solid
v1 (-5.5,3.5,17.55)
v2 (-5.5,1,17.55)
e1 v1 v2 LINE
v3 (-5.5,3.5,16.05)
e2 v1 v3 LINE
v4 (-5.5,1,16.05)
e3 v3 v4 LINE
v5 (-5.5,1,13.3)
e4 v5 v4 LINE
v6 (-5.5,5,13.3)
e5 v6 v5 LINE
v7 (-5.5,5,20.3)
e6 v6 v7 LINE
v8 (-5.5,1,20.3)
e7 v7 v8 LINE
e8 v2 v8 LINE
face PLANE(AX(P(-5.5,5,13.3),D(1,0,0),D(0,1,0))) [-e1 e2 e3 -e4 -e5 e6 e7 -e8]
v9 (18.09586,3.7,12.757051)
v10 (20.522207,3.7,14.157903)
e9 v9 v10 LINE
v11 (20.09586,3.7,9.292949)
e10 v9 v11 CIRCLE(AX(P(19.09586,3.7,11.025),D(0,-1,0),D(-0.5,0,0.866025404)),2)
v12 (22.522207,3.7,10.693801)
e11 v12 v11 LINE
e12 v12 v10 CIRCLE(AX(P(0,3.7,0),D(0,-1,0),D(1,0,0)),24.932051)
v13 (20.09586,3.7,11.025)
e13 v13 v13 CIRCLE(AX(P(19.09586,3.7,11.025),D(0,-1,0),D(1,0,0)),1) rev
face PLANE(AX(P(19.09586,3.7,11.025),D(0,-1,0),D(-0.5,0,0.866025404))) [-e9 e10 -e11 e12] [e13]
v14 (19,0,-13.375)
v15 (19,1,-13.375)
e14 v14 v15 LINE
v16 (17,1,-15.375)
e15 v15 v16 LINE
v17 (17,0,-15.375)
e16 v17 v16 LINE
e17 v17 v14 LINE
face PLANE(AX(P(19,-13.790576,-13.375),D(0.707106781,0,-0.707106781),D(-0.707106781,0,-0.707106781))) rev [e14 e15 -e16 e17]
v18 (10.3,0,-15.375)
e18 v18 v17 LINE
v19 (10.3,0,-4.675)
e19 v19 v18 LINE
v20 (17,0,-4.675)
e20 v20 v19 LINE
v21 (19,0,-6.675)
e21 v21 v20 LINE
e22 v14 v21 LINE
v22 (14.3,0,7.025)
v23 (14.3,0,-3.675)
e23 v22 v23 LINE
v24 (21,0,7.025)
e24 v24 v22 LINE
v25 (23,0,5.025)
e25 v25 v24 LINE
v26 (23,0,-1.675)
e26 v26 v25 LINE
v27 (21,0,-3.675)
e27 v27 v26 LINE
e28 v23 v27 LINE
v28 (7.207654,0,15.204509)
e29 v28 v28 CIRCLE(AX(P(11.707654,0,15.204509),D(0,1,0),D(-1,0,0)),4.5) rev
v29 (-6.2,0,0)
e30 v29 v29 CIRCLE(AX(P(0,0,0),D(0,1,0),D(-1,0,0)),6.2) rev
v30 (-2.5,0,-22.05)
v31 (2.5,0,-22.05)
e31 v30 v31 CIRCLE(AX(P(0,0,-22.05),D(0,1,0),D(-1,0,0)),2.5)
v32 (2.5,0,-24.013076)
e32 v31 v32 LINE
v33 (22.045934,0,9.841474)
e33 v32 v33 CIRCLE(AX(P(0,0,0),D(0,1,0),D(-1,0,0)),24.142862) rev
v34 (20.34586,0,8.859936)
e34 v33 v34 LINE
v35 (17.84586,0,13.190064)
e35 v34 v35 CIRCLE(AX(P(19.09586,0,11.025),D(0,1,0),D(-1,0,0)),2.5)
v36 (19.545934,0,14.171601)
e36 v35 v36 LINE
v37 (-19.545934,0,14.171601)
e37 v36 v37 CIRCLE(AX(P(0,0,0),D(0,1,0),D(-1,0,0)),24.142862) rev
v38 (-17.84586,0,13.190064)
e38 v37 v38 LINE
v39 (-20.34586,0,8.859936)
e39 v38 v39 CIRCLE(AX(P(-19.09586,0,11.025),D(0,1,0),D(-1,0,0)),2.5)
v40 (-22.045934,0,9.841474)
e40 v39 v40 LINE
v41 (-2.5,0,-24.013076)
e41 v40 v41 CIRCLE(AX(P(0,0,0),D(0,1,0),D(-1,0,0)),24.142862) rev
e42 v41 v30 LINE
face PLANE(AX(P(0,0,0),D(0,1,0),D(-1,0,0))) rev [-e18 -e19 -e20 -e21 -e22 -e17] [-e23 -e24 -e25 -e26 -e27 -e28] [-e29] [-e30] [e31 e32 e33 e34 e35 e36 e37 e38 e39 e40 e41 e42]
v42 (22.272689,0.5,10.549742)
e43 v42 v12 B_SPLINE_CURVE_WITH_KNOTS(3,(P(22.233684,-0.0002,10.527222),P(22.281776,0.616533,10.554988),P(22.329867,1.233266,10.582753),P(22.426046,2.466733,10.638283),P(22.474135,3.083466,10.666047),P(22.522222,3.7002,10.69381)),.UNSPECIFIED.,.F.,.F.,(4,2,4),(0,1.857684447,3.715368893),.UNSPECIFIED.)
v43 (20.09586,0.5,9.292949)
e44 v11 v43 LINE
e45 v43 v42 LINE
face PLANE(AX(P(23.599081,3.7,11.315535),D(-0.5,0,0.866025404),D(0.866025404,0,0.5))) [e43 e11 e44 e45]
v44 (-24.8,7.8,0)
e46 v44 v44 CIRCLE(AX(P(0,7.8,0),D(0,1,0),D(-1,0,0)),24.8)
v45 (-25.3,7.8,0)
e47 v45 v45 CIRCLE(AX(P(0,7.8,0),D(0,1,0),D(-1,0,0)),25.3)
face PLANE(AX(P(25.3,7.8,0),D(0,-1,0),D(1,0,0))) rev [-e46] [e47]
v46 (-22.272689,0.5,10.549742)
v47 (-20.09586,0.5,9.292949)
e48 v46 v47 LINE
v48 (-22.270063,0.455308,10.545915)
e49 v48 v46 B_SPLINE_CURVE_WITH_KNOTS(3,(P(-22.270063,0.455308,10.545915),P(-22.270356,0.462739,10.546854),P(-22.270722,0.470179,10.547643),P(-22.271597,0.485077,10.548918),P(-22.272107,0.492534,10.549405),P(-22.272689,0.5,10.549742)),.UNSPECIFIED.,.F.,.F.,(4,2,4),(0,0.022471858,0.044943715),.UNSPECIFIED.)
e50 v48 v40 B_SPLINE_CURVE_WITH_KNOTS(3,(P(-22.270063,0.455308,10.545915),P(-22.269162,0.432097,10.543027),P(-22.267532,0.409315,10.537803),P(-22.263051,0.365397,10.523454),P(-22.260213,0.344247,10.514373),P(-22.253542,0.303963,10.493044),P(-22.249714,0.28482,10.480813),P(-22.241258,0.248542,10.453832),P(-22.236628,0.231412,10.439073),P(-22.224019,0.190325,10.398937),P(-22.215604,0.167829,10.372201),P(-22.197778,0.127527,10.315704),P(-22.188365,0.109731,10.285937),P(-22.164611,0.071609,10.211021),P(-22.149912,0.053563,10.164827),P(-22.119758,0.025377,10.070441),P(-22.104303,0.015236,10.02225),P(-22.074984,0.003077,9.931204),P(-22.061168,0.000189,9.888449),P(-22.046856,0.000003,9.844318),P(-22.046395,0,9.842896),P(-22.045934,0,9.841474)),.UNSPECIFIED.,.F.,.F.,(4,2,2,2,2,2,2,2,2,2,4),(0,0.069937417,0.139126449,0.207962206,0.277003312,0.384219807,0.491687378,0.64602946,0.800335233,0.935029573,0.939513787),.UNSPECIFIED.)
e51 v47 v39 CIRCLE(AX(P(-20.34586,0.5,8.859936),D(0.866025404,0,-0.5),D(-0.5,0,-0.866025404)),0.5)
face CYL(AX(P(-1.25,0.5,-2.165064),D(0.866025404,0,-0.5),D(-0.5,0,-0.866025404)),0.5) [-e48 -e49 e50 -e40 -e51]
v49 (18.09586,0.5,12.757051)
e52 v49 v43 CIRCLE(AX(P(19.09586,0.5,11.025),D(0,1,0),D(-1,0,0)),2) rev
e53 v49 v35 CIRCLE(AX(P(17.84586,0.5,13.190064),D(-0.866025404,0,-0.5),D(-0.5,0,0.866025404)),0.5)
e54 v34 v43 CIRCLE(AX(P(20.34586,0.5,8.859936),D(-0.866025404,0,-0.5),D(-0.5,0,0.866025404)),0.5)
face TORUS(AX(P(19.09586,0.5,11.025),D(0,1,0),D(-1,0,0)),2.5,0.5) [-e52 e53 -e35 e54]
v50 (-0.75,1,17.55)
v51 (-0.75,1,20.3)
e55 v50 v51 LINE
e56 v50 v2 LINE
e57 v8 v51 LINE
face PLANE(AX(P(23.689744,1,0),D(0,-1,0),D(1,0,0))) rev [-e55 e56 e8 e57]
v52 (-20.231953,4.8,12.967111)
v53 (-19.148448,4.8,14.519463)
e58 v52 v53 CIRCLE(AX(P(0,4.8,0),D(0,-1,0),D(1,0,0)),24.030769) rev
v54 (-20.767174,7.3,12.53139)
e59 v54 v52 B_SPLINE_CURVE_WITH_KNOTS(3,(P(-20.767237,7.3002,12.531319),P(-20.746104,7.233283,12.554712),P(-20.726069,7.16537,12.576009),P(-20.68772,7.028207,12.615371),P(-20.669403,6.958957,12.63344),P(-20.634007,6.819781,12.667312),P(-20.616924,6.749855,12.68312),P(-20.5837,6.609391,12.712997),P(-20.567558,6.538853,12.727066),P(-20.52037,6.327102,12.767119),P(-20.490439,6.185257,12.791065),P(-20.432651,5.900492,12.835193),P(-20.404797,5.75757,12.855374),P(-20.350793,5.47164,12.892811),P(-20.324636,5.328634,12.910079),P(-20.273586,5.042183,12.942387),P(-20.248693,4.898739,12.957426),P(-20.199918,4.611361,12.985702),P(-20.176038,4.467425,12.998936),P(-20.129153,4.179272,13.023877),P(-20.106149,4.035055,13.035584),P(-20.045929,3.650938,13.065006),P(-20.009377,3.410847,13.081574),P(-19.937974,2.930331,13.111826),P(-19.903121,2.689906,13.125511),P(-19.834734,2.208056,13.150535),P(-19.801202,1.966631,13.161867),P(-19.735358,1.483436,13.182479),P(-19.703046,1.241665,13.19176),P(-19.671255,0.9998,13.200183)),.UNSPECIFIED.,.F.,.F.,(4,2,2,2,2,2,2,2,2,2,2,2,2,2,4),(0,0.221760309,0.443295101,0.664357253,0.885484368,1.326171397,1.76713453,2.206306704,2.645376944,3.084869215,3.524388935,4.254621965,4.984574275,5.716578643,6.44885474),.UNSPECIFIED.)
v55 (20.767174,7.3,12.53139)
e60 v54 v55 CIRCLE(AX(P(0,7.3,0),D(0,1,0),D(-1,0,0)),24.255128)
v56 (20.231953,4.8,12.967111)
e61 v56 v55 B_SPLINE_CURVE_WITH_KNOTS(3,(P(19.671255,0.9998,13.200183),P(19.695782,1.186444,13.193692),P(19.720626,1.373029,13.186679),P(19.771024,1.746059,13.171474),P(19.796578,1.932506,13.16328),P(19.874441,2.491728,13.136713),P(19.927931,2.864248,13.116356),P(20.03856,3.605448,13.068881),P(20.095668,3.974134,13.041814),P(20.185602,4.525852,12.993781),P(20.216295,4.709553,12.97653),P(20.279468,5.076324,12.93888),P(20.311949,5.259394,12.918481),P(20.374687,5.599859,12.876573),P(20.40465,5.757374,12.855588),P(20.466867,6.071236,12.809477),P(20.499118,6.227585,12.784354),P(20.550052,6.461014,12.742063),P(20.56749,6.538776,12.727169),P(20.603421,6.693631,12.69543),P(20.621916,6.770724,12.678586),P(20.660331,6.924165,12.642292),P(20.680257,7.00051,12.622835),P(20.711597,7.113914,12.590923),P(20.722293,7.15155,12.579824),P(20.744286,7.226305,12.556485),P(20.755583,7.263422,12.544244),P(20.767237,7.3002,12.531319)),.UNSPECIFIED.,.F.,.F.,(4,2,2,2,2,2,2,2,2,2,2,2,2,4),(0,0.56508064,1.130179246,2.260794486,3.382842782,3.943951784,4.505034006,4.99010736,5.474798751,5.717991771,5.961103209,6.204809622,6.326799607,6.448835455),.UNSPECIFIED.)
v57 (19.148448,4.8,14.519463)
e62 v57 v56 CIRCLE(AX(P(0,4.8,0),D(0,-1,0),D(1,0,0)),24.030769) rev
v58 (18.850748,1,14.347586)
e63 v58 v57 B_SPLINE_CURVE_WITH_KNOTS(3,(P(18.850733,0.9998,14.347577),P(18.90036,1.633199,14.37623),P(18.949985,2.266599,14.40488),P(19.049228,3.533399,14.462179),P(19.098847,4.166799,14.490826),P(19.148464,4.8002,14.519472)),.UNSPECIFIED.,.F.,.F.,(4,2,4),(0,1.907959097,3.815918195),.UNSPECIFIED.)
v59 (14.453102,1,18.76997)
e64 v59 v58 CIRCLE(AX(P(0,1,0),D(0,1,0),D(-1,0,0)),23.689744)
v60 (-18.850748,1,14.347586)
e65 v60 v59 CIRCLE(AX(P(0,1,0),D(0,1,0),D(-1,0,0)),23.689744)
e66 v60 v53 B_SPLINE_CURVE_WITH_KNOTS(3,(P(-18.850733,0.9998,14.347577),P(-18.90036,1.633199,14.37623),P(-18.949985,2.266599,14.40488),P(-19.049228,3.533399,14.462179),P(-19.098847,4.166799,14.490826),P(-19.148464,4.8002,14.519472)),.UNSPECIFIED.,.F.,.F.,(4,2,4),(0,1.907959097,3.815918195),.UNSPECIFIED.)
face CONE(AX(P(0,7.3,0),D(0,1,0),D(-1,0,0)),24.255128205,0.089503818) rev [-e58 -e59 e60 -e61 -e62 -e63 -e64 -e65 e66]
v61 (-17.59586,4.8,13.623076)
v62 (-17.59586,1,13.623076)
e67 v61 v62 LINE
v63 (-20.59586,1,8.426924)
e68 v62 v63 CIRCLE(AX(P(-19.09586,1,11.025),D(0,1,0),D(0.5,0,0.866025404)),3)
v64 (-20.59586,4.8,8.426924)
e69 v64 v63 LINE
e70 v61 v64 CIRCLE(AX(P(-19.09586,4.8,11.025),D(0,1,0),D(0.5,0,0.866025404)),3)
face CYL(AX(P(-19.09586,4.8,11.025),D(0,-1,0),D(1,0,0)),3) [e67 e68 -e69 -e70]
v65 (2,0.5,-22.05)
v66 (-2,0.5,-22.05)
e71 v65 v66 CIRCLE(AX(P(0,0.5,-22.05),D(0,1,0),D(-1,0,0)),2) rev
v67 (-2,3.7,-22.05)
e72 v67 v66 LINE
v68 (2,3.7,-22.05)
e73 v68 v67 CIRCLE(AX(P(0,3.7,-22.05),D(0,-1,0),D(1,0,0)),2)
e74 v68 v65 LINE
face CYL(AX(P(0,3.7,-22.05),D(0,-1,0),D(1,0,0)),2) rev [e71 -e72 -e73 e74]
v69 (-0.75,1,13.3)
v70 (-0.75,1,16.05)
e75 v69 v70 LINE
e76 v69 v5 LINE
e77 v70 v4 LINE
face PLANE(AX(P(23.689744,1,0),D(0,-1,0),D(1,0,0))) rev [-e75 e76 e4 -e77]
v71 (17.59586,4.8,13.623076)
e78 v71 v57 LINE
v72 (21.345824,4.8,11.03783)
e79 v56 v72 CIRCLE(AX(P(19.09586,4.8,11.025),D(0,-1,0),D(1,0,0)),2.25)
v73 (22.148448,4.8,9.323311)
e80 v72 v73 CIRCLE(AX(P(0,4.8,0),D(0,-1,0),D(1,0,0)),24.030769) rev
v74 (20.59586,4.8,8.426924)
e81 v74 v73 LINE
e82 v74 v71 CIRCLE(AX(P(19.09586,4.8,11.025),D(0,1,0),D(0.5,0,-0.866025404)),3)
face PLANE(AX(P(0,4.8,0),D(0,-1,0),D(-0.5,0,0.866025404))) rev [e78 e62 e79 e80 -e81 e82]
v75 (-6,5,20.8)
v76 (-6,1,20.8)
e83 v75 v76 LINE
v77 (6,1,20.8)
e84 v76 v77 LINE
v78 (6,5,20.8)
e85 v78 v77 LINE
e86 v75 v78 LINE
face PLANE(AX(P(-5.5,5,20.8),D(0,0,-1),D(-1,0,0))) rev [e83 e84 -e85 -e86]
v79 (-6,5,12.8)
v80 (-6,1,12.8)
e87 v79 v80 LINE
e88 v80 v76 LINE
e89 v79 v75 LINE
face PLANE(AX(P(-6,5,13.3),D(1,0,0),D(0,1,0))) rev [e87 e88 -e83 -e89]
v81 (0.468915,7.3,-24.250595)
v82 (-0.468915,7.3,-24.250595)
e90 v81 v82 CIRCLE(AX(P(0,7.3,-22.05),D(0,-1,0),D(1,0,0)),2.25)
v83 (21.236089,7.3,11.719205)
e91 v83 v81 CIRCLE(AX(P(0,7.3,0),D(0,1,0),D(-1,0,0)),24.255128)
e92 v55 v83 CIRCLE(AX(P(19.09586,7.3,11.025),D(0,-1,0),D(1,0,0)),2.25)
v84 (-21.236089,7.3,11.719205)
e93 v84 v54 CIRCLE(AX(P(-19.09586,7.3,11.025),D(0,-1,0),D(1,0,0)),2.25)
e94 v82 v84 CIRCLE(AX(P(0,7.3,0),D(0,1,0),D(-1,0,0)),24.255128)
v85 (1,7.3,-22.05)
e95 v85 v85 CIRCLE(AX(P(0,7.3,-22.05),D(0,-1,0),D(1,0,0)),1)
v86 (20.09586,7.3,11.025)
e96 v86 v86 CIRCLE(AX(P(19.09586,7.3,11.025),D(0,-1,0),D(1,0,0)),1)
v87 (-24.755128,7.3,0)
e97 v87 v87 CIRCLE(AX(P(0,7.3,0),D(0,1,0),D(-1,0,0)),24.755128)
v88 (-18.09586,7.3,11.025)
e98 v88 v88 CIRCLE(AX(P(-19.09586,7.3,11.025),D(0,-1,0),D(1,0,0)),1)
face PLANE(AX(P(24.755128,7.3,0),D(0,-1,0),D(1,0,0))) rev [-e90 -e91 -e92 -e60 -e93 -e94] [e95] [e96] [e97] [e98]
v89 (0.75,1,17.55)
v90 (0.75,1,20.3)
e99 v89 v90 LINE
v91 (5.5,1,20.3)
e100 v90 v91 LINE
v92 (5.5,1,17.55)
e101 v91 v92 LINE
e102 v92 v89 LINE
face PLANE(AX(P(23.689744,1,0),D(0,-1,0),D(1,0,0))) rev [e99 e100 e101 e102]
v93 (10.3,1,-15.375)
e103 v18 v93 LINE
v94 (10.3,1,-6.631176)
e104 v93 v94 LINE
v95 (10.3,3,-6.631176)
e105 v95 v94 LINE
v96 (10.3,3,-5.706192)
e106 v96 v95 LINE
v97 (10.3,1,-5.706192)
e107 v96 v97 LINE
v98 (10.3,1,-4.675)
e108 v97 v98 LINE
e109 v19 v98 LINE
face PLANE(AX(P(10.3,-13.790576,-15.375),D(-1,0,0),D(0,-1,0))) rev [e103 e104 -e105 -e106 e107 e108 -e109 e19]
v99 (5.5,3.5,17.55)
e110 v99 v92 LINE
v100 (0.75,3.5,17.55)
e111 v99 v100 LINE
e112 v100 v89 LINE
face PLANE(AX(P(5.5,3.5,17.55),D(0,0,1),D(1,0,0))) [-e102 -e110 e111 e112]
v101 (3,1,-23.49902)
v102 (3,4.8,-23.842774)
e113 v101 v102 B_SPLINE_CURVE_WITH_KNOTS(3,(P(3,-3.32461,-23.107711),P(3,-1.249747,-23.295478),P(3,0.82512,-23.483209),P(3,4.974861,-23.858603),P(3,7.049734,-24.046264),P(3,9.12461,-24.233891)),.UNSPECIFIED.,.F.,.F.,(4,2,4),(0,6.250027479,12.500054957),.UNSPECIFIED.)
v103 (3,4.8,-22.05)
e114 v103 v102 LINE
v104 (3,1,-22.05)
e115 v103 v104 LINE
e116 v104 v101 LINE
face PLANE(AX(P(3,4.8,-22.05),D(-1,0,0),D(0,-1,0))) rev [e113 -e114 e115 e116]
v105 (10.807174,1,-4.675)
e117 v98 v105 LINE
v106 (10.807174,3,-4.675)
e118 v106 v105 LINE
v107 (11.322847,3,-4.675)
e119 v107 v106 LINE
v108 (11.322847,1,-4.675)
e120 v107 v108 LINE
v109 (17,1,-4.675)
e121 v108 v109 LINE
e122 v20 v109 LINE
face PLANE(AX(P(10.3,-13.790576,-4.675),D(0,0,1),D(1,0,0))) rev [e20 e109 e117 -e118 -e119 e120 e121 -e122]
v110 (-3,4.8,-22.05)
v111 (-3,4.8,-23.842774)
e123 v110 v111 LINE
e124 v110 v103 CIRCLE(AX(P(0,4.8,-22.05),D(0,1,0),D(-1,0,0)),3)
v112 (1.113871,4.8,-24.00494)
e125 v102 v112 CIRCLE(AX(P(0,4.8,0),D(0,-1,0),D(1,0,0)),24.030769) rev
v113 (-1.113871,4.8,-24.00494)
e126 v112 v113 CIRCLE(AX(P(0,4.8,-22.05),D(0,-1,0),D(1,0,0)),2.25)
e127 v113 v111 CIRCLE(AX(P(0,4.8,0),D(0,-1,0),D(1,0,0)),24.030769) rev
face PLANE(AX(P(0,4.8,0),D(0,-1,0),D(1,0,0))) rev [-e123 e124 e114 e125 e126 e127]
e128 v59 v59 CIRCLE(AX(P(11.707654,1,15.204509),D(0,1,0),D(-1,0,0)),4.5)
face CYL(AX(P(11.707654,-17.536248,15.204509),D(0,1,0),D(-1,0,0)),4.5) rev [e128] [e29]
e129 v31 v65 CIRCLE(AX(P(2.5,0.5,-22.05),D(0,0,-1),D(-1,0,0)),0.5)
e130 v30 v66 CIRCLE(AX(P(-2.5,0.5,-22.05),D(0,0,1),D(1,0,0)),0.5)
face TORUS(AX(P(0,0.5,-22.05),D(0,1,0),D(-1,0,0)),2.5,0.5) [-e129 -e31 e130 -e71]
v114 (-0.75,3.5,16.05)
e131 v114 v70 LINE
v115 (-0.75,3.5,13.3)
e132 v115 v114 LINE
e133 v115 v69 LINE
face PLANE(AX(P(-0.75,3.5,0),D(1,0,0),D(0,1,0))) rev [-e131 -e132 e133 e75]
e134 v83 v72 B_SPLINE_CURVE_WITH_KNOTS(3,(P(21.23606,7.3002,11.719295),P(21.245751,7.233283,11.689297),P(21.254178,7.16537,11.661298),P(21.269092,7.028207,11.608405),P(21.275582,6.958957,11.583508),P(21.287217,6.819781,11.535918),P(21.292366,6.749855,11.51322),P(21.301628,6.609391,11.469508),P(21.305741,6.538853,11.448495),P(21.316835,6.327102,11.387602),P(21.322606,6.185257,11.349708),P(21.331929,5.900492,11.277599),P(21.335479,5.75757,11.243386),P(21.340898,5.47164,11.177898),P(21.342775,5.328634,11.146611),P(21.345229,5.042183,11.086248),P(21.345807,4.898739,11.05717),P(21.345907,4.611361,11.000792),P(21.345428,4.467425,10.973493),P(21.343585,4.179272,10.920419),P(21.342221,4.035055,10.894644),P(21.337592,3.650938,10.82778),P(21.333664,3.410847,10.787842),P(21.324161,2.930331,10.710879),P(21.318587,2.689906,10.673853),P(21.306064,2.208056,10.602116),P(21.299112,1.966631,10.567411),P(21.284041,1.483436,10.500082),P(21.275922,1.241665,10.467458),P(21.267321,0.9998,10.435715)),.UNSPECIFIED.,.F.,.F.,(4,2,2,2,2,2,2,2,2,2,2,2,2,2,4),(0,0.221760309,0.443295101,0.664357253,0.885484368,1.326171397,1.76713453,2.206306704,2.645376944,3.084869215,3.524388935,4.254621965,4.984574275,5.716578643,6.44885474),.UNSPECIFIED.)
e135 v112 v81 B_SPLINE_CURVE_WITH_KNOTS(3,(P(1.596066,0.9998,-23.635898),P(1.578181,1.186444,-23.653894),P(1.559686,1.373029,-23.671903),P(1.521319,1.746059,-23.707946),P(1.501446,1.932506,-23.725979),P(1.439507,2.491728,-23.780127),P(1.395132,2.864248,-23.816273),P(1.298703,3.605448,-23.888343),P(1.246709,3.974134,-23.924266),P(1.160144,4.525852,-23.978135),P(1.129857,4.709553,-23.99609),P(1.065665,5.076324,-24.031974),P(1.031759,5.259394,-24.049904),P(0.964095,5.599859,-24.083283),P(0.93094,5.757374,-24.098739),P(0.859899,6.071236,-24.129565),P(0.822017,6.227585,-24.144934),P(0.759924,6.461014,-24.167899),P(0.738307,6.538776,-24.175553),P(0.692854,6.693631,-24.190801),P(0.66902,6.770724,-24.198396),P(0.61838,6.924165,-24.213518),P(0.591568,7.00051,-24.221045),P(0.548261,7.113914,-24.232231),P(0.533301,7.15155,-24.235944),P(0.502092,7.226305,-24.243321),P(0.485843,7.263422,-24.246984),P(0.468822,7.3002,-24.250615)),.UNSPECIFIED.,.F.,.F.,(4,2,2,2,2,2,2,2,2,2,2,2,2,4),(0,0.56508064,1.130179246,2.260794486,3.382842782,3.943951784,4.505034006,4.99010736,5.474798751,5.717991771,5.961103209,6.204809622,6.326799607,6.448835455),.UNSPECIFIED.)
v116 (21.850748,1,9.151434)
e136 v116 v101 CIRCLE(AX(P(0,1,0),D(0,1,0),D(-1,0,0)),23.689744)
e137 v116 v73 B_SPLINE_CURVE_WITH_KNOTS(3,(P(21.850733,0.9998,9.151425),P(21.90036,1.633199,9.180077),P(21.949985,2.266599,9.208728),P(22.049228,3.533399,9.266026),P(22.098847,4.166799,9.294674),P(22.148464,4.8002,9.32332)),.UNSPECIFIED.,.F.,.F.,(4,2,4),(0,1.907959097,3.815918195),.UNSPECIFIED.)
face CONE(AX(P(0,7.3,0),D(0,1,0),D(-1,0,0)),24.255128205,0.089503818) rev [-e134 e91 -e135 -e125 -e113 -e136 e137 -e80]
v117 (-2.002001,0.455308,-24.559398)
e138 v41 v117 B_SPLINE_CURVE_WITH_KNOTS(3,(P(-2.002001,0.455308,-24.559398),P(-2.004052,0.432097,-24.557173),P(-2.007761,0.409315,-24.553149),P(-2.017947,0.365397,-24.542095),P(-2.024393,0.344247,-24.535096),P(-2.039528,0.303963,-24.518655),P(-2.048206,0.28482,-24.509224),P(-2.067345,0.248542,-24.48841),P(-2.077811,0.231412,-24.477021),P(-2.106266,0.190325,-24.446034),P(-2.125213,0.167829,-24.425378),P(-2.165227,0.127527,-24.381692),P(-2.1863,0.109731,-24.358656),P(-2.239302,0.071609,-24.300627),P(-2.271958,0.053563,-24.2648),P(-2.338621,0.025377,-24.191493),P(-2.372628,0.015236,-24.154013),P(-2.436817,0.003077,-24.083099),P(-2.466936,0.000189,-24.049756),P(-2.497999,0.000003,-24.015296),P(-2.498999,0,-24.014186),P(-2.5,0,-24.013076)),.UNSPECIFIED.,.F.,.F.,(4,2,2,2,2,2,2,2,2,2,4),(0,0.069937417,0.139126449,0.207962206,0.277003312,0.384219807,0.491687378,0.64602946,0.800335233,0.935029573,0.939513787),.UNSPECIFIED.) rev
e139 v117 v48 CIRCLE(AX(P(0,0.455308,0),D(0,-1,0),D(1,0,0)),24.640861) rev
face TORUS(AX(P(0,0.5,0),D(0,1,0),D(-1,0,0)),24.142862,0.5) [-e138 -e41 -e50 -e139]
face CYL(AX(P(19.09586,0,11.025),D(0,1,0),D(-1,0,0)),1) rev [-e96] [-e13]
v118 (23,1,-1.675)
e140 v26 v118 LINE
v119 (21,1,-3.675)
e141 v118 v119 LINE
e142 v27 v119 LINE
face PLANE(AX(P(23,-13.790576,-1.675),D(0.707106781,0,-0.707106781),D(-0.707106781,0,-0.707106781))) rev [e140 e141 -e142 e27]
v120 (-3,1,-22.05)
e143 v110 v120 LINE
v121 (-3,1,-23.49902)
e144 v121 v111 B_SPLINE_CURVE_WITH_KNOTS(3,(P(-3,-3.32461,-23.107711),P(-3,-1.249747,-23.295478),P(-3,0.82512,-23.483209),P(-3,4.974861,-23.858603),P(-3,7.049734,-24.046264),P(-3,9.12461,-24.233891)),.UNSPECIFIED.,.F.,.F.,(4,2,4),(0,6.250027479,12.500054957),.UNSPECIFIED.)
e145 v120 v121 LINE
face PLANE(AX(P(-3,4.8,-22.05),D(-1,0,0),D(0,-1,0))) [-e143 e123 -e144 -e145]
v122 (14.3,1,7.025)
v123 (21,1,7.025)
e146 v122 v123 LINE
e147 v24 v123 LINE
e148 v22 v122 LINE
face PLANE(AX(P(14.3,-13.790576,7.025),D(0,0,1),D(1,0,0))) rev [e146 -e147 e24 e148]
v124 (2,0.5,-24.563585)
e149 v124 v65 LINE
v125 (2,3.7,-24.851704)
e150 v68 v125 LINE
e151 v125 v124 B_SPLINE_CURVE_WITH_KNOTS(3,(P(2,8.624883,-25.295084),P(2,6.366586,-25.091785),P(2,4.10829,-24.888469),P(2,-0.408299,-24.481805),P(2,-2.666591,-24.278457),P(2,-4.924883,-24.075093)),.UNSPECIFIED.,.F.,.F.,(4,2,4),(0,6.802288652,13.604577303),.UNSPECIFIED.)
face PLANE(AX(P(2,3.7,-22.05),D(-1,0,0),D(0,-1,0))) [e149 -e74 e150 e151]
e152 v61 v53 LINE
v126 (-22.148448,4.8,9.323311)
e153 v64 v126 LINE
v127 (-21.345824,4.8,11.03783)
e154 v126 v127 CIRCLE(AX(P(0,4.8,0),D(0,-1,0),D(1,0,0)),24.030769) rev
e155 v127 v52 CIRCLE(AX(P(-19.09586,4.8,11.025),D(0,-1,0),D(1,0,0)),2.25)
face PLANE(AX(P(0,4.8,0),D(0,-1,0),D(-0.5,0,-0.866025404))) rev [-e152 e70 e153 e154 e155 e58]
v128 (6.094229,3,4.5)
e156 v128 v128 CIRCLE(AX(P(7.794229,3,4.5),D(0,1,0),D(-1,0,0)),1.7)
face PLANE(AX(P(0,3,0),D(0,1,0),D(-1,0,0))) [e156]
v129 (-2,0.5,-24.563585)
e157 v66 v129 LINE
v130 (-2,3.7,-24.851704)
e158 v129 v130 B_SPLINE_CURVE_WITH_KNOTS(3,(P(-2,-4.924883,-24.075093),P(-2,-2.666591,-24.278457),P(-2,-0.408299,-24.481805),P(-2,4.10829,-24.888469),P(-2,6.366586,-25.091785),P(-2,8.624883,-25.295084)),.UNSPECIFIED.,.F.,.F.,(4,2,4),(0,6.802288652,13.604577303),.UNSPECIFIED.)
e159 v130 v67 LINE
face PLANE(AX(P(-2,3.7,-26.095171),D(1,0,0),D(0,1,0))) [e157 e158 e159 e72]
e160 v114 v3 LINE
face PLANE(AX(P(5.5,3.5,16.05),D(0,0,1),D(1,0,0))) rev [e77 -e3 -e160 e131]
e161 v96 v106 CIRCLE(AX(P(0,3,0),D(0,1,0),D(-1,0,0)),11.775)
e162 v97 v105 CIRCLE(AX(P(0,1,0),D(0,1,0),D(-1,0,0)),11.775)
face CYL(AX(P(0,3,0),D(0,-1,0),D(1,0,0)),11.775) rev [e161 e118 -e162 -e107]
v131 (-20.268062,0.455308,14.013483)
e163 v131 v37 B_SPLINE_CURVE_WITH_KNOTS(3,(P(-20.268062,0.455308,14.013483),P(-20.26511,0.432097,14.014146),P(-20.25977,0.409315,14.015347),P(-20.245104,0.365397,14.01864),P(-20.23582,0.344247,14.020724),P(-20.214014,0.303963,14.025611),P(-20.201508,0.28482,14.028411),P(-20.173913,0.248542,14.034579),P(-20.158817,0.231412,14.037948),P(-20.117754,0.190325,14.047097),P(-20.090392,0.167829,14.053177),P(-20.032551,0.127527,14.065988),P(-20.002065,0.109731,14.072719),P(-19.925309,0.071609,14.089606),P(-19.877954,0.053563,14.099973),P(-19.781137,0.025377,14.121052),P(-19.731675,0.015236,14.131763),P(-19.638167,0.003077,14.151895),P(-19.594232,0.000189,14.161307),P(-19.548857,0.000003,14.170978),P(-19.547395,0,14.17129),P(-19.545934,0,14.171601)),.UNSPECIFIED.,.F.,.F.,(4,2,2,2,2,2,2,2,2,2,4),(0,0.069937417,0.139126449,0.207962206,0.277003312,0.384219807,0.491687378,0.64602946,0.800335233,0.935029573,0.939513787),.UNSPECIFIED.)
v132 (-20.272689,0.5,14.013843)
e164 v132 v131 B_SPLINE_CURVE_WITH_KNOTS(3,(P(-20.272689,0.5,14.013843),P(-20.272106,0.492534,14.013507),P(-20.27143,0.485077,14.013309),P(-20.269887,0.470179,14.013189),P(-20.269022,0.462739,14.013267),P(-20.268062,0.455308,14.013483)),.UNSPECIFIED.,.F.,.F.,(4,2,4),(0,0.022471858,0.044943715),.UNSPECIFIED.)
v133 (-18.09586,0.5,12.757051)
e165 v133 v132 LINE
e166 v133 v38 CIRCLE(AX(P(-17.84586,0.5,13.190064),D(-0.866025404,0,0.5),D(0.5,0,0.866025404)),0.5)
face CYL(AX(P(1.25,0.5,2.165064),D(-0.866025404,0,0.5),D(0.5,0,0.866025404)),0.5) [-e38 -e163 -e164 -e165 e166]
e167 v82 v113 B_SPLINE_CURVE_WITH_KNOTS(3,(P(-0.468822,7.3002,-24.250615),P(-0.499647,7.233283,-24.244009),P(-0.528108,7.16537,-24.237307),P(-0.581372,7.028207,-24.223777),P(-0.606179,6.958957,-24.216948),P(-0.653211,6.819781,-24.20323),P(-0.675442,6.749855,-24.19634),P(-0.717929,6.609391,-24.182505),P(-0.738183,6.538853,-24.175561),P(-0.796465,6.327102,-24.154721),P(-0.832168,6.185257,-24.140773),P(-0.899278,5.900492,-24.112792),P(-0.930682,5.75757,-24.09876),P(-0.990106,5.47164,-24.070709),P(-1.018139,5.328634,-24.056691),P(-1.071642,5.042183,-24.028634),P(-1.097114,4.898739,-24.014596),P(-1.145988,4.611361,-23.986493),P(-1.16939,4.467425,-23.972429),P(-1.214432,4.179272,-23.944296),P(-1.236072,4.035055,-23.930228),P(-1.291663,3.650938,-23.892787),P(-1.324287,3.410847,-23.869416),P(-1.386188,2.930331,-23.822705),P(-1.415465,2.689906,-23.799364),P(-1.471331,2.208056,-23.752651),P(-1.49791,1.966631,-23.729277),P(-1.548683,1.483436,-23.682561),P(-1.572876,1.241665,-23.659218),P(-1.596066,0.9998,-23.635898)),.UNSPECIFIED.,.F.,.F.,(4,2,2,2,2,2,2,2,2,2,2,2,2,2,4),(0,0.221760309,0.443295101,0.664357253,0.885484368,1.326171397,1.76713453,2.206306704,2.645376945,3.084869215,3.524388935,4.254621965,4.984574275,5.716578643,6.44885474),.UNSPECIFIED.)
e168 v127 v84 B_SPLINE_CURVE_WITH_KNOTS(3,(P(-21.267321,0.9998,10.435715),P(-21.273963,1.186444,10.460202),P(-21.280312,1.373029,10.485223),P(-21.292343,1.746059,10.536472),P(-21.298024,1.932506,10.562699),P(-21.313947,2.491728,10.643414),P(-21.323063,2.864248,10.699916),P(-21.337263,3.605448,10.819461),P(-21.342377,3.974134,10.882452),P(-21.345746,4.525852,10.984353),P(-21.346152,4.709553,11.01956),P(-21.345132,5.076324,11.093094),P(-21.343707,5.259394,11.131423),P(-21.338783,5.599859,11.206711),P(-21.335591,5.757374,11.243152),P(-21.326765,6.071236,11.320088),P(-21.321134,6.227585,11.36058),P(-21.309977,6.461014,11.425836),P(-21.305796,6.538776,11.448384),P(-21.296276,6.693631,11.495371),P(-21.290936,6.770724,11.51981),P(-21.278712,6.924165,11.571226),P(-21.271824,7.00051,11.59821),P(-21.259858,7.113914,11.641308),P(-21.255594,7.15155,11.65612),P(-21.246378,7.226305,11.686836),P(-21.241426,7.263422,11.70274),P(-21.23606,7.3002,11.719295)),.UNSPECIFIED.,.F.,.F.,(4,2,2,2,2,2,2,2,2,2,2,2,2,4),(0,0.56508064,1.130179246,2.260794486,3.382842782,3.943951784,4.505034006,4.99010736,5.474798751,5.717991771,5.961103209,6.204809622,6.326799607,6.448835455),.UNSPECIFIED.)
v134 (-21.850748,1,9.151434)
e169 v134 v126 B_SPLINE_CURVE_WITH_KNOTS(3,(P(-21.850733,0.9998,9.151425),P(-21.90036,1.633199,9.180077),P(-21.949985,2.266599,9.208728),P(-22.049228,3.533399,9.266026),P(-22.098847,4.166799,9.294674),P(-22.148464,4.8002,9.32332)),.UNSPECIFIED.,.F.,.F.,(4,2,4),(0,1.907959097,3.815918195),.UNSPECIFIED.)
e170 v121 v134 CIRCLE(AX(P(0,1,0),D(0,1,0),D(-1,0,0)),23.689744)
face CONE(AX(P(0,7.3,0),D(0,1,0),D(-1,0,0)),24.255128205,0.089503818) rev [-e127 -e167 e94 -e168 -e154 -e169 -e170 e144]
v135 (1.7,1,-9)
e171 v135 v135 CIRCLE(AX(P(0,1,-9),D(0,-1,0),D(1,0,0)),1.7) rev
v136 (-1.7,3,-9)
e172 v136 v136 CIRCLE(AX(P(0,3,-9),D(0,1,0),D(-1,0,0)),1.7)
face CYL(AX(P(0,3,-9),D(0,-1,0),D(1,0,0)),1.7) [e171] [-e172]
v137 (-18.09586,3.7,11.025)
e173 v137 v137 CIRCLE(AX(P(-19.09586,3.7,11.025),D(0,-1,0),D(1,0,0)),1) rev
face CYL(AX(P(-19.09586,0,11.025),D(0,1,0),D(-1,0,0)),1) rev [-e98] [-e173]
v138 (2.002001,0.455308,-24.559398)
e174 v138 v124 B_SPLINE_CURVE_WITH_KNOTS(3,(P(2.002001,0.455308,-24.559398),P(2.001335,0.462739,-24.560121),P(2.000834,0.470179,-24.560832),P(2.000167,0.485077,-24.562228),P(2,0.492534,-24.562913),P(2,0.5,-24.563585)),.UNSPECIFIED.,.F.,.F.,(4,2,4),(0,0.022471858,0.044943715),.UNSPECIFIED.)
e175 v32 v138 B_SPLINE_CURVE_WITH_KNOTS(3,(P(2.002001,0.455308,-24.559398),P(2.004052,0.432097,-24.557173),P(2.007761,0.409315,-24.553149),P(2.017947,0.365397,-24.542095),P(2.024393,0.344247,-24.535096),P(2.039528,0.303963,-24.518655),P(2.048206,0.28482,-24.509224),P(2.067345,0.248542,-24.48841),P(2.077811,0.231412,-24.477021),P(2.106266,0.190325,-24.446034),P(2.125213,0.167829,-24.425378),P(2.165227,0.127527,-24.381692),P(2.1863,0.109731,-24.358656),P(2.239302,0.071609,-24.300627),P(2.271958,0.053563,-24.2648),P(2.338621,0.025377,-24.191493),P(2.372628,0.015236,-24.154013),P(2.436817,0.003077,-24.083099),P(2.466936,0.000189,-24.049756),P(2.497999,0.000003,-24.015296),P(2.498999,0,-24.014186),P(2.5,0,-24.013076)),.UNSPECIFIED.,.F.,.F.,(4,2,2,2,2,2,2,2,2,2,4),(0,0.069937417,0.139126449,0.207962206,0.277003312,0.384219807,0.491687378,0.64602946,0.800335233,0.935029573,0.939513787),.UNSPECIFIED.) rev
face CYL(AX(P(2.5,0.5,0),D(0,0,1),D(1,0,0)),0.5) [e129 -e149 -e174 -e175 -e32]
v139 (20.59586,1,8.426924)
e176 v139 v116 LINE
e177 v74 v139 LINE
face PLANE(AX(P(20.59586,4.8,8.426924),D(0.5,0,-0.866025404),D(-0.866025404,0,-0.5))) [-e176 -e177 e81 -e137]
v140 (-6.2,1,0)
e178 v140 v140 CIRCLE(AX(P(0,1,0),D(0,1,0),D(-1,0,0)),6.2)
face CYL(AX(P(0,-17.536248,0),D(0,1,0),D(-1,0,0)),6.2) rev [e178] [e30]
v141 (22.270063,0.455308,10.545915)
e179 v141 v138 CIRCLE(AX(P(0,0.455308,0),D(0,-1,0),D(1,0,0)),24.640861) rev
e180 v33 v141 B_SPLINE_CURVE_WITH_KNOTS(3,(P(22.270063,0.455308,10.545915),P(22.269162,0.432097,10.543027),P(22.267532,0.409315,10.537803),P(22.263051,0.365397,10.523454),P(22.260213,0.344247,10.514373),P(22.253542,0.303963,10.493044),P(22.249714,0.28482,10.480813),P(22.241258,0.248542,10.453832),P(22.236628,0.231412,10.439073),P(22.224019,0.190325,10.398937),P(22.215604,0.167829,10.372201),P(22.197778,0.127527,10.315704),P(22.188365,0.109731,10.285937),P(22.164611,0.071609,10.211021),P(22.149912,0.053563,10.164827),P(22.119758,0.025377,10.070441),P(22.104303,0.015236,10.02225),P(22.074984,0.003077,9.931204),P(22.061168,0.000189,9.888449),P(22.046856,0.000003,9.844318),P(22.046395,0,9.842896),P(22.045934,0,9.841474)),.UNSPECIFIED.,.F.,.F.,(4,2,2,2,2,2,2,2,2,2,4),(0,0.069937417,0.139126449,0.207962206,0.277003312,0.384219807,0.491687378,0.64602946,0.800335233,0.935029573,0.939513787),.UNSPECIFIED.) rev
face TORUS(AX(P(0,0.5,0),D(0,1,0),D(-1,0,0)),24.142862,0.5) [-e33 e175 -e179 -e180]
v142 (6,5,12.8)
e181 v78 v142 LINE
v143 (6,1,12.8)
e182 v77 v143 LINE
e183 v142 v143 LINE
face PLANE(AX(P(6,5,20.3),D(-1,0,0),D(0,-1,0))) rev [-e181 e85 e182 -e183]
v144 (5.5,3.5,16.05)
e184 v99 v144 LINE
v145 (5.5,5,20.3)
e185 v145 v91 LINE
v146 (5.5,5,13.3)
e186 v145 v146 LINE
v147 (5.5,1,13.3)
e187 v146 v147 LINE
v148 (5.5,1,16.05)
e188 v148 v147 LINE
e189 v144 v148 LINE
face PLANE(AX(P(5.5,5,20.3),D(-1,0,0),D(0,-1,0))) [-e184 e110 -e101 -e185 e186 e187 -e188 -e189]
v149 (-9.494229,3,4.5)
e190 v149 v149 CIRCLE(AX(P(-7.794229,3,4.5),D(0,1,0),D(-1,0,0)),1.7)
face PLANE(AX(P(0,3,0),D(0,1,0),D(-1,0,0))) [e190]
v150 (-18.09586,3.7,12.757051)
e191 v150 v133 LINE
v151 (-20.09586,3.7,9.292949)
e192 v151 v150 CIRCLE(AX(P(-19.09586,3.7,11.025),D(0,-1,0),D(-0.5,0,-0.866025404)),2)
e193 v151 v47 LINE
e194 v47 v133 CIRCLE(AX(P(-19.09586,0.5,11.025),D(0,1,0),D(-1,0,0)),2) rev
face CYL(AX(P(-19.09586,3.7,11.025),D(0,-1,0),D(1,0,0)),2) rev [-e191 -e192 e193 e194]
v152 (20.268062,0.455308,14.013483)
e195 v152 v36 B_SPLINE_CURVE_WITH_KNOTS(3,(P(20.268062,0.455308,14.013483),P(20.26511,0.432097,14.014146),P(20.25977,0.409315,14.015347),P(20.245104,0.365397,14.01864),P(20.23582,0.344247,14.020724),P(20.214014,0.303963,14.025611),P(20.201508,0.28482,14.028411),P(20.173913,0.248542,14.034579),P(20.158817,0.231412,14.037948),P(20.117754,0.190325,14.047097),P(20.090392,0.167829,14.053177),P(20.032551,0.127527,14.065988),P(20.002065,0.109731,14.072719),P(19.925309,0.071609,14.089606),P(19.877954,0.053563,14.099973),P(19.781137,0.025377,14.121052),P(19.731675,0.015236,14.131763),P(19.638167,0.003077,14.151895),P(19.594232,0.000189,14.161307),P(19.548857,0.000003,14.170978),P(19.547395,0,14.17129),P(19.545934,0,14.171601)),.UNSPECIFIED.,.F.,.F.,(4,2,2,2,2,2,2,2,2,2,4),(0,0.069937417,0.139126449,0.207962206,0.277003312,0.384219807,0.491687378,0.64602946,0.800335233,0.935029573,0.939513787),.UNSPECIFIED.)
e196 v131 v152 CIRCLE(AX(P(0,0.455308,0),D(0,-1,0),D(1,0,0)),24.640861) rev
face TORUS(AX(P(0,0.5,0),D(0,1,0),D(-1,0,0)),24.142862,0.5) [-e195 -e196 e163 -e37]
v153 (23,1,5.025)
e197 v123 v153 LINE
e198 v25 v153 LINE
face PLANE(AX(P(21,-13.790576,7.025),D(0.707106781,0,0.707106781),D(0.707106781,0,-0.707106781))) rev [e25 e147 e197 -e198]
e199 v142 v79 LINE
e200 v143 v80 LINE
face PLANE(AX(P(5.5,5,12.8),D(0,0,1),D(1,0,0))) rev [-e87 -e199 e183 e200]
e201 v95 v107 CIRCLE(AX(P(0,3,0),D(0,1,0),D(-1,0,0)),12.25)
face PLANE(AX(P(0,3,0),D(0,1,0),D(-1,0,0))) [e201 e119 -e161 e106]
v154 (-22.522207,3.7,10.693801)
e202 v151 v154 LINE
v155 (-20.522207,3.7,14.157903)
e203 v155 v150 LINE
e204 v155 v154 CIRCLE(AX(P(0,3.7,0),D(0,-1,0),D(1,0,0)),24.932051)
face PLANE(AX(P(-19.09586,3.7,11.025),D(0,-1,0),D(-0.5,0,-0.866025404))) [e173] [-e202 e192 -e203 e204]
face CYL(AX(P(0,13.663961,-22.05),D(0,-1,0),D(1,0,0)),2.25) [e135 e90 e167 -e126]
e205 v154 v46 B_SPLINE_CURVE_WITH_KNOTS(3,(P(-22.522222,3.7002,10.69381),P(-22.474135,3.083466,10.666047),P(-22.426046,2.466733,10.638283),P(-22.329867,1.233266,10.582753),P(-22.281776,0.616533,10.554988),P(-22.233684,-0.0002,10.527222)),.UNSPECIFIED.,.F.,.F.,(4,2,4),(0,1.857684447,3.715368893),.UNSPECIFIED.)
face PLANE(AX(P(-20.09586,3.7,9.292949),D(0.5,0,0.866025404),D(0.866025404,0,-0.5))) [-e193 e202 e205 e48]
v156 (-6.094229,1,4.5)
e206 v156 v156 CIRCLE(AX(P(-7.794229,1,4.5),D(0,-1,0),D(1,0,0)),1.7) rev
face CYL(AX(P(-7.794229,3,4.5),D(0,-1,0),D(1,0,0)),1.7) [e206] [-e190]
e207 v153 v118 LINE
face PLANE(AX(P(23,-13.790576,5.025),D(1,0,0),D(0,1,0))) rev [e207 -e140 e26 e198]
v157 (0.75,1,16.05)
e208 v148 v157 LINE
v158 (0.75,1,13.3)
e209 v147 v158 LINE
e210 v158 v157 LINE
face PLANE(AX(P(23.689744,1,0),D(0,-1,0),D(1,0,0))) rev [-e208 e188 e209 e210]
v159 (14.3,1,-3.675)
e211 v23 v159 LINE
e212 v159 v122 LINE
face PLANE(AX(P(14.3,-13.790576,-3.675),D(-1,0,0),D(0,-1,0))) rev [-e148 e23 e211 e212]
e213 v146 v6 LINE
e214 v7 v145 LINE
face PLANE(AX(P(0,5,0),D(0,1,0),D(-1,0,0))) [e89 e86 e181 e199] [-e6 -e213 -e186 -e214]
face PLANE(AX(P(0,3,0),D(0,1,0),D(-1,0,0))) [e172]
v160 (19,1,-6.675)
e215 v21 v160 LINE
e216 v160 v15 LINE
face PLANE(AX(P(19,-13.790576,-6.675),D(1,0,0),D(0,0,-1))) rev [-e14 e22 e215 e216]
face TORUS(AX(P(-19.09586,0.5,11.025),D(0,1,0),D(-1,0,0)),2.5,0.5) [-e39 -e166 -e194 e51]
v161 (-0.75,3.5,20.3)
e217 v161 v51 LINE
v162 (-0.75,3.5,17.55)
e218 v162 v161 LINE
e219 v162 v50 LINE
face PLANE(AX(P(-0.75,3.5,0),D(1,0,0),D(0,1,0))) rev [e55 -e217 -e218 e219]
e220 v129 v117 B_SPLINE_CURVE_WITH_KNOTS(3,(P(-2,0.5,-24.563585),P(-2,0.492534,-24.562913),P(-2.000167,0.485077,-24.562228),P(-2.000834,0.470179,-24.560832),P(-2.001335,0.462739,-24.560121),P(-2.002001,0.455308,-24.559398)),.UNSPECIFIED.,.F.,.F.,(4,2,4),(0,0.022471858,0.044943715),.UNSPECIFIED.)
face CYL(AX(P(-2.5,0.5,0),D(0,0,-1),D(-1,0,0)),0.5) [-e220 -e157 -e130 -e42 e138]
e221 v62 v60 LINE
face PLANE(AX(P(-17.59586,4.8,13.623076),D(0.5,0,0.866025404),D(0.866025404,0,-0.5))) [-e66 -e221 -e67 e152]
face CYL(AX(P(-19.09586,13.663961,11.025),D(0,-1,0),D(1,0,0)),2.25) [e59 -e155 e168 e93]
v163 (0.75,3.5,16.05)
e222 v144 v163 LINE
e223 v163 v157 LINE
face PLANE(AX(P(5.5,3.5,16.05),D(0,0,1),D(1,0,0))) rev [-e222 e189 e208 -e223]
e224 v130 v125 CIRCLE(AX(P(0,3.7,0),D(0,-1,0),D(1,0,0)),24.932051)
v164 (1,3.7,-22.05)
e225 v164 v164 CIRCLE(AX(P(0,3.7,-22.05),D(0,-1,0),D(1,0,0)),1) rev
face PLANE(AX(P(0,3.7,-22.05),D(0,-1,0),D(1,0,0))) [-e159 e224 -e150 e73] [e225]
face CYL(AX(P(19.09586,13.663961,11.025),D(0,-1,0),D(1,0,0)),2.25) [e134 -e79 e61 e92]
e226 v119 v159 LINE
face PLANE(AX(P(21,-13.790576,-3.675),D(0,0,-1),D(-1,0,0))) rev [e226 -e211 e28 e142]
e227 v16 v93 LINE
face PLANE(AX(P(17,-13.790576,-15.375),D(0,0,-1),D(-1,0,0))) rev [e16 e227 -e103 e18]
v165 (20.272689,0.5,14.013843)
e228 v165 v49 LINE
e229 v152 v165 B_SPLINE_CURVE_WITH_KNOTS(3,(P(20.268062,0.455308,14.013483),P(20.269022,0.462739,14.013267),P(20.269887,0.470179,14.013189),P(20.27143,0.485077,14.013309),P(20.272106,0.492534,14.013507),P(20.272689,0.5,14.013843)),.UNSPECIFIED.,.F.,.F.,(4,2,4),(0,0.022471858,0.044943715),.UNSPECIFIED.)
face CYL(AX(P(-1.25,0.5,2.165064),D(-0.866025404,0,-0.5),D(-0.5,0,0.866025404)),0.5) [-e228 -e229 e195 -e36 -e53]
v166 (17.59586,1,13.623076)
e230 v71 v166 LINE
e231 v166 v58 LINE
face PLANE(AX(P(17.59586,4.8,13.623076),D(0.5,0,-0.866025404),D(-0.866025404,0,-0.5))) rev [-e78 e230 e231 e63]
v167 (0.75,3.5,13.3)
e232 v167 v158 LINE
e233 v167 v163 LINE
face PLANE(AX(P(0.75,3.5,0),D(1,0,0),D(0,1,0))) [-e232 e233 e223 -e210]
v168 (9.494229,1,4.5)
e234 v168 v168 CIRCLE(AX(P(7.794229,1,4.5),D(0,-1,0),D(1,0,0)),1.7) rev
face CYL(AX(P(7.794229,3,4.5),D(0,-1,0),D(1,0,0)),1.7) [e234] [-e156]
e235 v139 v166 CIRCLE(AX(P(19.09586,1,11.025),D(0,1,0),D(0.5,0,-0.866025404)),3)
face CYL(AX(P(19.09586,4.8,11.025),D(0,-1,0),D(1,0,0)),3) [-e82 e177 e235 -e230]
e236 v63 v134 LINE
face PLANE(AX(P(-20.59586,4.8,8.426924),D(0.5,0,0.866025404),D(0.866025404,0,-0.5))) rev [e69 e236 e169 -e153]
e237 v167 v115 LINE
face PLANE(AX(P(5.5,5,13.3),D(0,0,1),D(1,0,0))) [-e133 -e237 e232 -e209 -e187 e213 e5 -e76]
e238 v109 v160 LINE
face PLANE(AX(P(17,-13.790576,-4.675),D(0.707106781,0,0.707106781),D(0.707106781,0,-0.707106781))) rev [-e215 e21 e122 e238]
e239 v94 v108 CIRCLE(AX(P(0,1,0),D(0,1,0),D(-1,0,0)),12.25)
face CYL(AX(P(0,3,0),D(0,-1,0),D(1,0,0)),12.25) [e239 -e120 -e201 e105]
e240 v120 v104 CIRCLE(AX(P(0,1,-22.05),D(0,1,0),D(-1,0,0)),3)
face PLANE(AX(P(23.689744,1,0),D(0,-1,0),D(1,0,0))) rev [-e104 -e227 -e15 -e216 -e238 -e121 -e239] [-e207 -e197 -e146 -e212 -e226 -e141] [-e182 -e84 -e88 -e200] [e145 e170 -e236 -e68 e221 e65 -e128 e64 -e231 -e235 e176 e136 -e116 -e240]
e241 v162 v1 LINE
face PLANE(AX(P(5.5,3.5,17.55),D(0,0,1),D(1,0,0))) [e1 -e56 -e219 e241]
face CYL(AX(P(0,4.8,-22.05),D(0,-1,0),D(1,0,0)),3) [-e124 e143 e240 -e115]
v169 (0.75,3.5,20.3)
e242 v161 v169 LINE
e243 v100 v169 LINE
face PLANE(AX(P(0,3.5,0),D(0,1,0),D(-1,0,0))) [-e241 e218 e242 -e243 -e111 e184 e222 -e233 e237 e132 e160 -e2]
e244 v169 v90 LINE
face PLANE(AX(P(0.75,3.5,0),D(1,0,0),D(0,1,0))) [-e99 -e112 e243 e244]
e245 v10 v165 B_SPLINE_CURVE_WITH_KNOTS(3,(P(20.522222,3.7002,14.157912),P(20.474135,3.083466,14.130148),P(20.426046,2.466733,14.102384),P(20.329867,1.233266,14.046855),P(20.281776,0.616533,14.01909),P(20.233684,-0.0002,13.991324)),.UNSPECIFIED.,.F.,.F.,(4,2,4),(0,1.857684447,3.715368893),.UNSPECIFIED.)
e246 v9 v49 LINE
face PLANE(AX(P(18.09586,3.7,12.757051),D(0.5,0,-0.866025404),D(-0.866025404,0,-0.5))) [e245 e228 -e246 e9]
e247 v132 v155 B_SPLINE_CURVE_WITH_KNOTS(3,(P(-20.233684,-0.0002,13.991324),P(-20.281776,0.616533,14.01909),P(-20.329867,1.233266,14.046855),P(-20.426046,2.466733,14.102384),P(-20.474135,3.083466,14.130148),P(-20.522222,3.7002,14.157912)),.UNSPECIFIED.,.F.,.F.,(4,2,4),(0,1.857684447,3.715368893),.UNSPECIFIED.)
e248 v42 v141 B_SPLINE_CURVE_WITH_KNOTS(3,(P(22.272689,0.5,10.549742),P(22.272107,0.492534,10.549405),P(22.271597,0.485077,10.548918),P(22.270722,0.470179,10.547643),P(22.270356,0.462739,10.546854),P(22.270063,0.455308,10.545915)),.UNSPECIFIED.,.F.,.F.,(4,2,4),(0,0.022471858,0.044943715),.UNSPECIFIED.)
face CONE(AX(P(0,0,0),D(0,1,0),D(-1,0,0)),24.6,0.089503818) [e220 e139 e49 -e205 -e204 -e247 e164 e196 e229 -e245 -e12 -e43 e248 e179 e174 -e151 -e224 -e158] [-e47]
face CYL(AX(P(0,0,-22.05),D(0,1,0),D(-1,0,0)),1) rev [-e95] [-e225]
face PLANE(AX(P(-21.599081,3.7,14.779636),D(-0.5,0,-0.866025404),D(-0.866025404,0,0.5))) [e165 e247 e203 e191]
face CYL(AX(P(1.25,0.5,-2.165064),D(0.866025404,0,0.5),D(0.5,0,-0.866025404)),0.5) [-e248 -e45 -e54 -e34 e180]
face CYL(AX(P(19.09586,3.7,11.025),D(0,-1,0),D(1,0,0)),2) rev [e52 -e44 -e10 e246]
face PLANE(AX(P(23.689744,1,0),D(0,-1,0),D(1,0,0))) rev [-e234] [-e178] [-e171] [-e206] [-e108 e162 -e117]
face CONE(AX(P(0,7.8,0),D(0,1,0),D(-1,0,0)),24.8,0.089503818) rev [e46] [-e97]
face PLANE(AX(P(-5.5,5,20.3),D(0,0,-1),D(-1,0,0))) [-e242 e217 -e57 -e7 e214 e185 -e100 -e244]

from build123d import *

# Parameters (mm, degrees)
SKETCH_8_R               = 2.25
EXTRUDE_23_DEPTH         = 6.3
EXTRUDE_24_DEPTH         = 3.8
SKETCH_8_5_R             = 1
CUT_EXTRUDE_2_DEPTH      = 37.420049423
PATTERN_CIRCULAR_1_COUNT = 3
CUT_EXTRUDE_3_DEPTH      = 3.7
PATTERN_CIRCULAR_2_COUNT = 3
CUT_EXTRUDE_6_DEPTH      = 1
SKETCH_12_W              = 12
SKETCH_12_H              = 8
SKETCH_12_W_2            = 11
SKETCH_12_H_2            = 7
EXTRUDE_1_DEPTH          = 4
SKETCH_14_R              = 6.2
SKETCH_14_R_2            = 4.5
CUT_EXTRUDE_7_DEPTH      = 1
FILLET_1_R               = 0.5
EXTRUDE_25_DEPTH         = 2.5
EXTRUDE_26_OUTLINE_R     = 1.7
EXTRUDE_26_DEPTH         = 2


# Read off the part's stored shape, not the designer's step: 凸台-拉伸26
with BuildPart() as part:
    # 草图7 → 旋转1 (revolve)
    with BuildSketch(Plane.XY, mode=Mode.PRIVATE) as revolve_1_sk:
        Polygon((0, 0), (24.6, 0), (25.3, 7.8), (24.8, 7.8), (24.755128205, 7.3), (24.255128205, 7.3), (23.68974359, 1), (0, 1), align=None)
    revolve(revolve_1_sk.sketch.rotate(Axis((0, 1, 0), (0, -1, 0)), 180), axis=Axis((0, 1, 0), (0, -1, 0)))

    # 草图8 → 凸台-拉伸23 (add)
    with BuildSketch(Plane(origin=(0, 1, 0), x_dir=(1, 0, 0), z_dir=(0, 1, 0))):
        with Locations((0, 22.05)):
            Circle(SKETCH_8_R)
    extrude_23 = extrude(amount=EXTRUDE_23_DEPTH)

    # 草图8<4> → 凸台-拉伸24 (add)
    with BuildSketch(Plane(origin=(0, 1, 0), x_dir=(1, 0, 0), z_dir=(0, 1, 0))):
        with BuildLine():
            Line((-3, 22.05), (-3, 24.114103757))
            ThreePointArc((-3, 24.114103757), (0, 24.3), (3, 24.114103757))
            Line((3, 24.114103757), (3, 22.05))
            ThreePointArc((3, 22.05), (0, 19.05), (-3, 22.05))
        make_face()
    extrude_24 = extrude(amount=EXTRUDE_24_DEPTH)

    # 草图8<5> → 切除-拉伸2 (cut, symmetric)
    with BuildSketch(Plane(origin=(0, 1, 0), x_dir=(1, 0, 0), z_dir=(0, 1, 0))):
        with Locations(Location((0, 22.05, 0), (0, 0, 180))):
            Circle(SKETCH_8_5_R)
    cut_extrude_2 = extrude(amount=CUT_EXTRUDE_2_DEPTH, both=True, mode=Mode.SUBTRACT)

    # 阵列(圆周)1: 凸台-拉伸23, 凸台-拉伸24, 切除-拉伸2 ×3 about axis
    pattern_circular_1_axis = Axis((0, 0, 0), (0, 1, 0))
    add([extrude_23.rotate(pattern_circular_1_axis, i * 360 / PATTERN_CIRCULAR_1_COUNT) for i in range(1, PATTERN_CIRCULAR_1_COUNT)])
    add([extrude_24.rotate(pattern_circular_1_axis, i * 360 / PATTERN_CIRCULAR_1_COUNT) for i in range(1, PATTERN_CIRCULAR_1_COUNT)])
    add([cut_extrude_2.rotate(pattern_circular_1_axis, i * 360 / PATTERN_CIRCULAR_1_COUNT) for i in range(1, PATTERN_CIRCULAR_1_COUNT)], mode=Mode.SUBTRACT)

    # 草图9 → 切除-拉伸3 (cut)
    with BuildSketch(Plane.XZ):
        with BuildLine():
            Line((2, -22.05), (2, -26.095171051))
            Line((2, -26.095171051), (-2, -26.095171051))
            Line((-2, -26.095171051), (-2, -22.05))
            ThreePointArc((-2, -22.05), (0, -20.05), (2, -22.05))
        make_face()
    cut_extrude_3 = extrude(amount=-CUT_EXTRUDE_3_DEPTH, mode=Mode.SUBTRACT)

    # 阵列(圆周)2: 切除-拉伸3 ×3 about axis
    pattern_circular_2_axis = Axis((0, 0, 0), (0, 1, 0))
    for i in range(1, PATTERN_CIRCULAR_2_COUNT):
        add(cut_extrude_3.rotate(pattern_circular_2_axis, i * 360 / PATTERN_CIRCULAR_2_COUNT), mode=Mode.SUBTRACT)

    # 草图11 → 切除-拉伸6 (cut)
    with BuildSketch(Plane(origin=(0, 1, 0), x_dir=(1, 0, 0), z_dir=(0, 1, 0))):
        Polygon((10.3, 15.375), (10.3, 4.675), (17, 4.675), (19, 6.675), (19, 13.375), (17, 15.375), align=None)
        Polygon((14.3, 3.675), (14.3, -7.025), (21, -7.025), (23, -5.025), (23, 1.675), (21, 3.675), align=None)
    extrude(amount=-CUT_EXTRUDE_6_DEPTH, mode=Mode.SUBTRACT)

    # 草图12 → 拉伸-薄壁1 (add)
    with BuildSketch(Plane(origin=(0, 1, 0), x_dir=(1, 0, 0), z_dir=(0, 1, 0))):
        with Locations((0, -16.8)):
            Rectangle(SKETCH_12_W, SKETCH_12_H)
        with Locations((0, -16.8)):
            Rectangle(SKETCH_12_W_2, SKETCH_12_H_2, mode=Mode.SUBTRACT)
    extrude(amount=EXTRUDE_1_DEPTH)

    # 草图14 → 切除-拉伸7 (cut)
    with BuildSketch(Plane(origin=(0, 1, 0), x_dir=(1, 0, 0), z_dir=(0, 1, 0))):
        with Locations(Location((0, 0, 0), (0, 0, 180))):
            Circle(SKETCH_14_R)
        with Locations(Location((11.70765428, -15.20450888, 0), (0, 0, 180))):
            Circle(SKETCH_14_R_2)
    extrude(amount=-CUT_EXTRUDE_7_DEPTH, mode=Mode.SUBTRACT)

    # 圆角1
    fillet_1_edges = [part.edges().sort_by_distance(p)[0] for p in [
        (17.363809346, 0, 10.025),
        (21.164779892, 0, 9.910090291),
        (-21.164779892, 0, 9.910090291),
        (-17.363809346, 0, 10.025),
        (-19.164779892, 0, 13.374191906),
        (-18.088117647, 0, -16.67273223),
        (-2, 0, -23.284282198),
        (0, 0, -20.05),
        (2, 0, -23.284282198),
        (21.304224933, 0, -12.3),
        (19.164779892, 0, 13.374191906),
        (0, 0, 24.6),
    ]]
    fillet(fillet_1_edges, radius=FILLET_1_R)

    # 草图15 → 凸台-拉伸25 (add)
    with BuildSketch(Plane(origin=(0, 1, 0), x_dir=(1, 0, 0), z_dir=(0, 1, 0))):
        Polygon((0.75, -17.55), (5.5, -17.55), (5.5, -16.05), (0.75, -16.05), (0.75, -13.3), (-0.75, -13.3), (-0.75, -16.05), (-5.5, -16.05), (-5.5, -17.55), (-0.75, -17.55), (-0.75, -20.3), (0.75, -20.3), align=None)
    extrude(amount=EXTRUDE_25_DEPTH)

    # 凸台-拉伸26 outline → 凸台-拉伸26 (add)
    with BuildSketch(Plane(origin=(0, 1, 0), x_dir=(1, 0, 0), z_dir=(0, 1, 0))):
        with BuildLine():
            Line((11.322847478, 4.675), (10.807173544, 4.675))
            ThreePointArc((10.807173544, 4.675), (-10.566173989, -5.196786722), (10.3, 5.706191812))
            Line((10.3, 5.706191812), (10.3, 6.631176366))
            ThreePointArc((10.3, 6.631176366), (-10.855576433, -5.676174795), (11.322847478, 4.675))
        make_face()
        with Locations((0, 9)):
            Circle(EXTRUDE_26_OUTLINE_R)
        with Locations((7.794228634, -4.5)):
            Circle(EXTRUDE_26_OUTLINE_R)
        with Locations((-7.794228634, -4.5)):
            Circle(EXTRUDE_26_OUTLINE_R)
    extrude(amount=EXTRUDE_26_DEPTH)


solid = part.part
